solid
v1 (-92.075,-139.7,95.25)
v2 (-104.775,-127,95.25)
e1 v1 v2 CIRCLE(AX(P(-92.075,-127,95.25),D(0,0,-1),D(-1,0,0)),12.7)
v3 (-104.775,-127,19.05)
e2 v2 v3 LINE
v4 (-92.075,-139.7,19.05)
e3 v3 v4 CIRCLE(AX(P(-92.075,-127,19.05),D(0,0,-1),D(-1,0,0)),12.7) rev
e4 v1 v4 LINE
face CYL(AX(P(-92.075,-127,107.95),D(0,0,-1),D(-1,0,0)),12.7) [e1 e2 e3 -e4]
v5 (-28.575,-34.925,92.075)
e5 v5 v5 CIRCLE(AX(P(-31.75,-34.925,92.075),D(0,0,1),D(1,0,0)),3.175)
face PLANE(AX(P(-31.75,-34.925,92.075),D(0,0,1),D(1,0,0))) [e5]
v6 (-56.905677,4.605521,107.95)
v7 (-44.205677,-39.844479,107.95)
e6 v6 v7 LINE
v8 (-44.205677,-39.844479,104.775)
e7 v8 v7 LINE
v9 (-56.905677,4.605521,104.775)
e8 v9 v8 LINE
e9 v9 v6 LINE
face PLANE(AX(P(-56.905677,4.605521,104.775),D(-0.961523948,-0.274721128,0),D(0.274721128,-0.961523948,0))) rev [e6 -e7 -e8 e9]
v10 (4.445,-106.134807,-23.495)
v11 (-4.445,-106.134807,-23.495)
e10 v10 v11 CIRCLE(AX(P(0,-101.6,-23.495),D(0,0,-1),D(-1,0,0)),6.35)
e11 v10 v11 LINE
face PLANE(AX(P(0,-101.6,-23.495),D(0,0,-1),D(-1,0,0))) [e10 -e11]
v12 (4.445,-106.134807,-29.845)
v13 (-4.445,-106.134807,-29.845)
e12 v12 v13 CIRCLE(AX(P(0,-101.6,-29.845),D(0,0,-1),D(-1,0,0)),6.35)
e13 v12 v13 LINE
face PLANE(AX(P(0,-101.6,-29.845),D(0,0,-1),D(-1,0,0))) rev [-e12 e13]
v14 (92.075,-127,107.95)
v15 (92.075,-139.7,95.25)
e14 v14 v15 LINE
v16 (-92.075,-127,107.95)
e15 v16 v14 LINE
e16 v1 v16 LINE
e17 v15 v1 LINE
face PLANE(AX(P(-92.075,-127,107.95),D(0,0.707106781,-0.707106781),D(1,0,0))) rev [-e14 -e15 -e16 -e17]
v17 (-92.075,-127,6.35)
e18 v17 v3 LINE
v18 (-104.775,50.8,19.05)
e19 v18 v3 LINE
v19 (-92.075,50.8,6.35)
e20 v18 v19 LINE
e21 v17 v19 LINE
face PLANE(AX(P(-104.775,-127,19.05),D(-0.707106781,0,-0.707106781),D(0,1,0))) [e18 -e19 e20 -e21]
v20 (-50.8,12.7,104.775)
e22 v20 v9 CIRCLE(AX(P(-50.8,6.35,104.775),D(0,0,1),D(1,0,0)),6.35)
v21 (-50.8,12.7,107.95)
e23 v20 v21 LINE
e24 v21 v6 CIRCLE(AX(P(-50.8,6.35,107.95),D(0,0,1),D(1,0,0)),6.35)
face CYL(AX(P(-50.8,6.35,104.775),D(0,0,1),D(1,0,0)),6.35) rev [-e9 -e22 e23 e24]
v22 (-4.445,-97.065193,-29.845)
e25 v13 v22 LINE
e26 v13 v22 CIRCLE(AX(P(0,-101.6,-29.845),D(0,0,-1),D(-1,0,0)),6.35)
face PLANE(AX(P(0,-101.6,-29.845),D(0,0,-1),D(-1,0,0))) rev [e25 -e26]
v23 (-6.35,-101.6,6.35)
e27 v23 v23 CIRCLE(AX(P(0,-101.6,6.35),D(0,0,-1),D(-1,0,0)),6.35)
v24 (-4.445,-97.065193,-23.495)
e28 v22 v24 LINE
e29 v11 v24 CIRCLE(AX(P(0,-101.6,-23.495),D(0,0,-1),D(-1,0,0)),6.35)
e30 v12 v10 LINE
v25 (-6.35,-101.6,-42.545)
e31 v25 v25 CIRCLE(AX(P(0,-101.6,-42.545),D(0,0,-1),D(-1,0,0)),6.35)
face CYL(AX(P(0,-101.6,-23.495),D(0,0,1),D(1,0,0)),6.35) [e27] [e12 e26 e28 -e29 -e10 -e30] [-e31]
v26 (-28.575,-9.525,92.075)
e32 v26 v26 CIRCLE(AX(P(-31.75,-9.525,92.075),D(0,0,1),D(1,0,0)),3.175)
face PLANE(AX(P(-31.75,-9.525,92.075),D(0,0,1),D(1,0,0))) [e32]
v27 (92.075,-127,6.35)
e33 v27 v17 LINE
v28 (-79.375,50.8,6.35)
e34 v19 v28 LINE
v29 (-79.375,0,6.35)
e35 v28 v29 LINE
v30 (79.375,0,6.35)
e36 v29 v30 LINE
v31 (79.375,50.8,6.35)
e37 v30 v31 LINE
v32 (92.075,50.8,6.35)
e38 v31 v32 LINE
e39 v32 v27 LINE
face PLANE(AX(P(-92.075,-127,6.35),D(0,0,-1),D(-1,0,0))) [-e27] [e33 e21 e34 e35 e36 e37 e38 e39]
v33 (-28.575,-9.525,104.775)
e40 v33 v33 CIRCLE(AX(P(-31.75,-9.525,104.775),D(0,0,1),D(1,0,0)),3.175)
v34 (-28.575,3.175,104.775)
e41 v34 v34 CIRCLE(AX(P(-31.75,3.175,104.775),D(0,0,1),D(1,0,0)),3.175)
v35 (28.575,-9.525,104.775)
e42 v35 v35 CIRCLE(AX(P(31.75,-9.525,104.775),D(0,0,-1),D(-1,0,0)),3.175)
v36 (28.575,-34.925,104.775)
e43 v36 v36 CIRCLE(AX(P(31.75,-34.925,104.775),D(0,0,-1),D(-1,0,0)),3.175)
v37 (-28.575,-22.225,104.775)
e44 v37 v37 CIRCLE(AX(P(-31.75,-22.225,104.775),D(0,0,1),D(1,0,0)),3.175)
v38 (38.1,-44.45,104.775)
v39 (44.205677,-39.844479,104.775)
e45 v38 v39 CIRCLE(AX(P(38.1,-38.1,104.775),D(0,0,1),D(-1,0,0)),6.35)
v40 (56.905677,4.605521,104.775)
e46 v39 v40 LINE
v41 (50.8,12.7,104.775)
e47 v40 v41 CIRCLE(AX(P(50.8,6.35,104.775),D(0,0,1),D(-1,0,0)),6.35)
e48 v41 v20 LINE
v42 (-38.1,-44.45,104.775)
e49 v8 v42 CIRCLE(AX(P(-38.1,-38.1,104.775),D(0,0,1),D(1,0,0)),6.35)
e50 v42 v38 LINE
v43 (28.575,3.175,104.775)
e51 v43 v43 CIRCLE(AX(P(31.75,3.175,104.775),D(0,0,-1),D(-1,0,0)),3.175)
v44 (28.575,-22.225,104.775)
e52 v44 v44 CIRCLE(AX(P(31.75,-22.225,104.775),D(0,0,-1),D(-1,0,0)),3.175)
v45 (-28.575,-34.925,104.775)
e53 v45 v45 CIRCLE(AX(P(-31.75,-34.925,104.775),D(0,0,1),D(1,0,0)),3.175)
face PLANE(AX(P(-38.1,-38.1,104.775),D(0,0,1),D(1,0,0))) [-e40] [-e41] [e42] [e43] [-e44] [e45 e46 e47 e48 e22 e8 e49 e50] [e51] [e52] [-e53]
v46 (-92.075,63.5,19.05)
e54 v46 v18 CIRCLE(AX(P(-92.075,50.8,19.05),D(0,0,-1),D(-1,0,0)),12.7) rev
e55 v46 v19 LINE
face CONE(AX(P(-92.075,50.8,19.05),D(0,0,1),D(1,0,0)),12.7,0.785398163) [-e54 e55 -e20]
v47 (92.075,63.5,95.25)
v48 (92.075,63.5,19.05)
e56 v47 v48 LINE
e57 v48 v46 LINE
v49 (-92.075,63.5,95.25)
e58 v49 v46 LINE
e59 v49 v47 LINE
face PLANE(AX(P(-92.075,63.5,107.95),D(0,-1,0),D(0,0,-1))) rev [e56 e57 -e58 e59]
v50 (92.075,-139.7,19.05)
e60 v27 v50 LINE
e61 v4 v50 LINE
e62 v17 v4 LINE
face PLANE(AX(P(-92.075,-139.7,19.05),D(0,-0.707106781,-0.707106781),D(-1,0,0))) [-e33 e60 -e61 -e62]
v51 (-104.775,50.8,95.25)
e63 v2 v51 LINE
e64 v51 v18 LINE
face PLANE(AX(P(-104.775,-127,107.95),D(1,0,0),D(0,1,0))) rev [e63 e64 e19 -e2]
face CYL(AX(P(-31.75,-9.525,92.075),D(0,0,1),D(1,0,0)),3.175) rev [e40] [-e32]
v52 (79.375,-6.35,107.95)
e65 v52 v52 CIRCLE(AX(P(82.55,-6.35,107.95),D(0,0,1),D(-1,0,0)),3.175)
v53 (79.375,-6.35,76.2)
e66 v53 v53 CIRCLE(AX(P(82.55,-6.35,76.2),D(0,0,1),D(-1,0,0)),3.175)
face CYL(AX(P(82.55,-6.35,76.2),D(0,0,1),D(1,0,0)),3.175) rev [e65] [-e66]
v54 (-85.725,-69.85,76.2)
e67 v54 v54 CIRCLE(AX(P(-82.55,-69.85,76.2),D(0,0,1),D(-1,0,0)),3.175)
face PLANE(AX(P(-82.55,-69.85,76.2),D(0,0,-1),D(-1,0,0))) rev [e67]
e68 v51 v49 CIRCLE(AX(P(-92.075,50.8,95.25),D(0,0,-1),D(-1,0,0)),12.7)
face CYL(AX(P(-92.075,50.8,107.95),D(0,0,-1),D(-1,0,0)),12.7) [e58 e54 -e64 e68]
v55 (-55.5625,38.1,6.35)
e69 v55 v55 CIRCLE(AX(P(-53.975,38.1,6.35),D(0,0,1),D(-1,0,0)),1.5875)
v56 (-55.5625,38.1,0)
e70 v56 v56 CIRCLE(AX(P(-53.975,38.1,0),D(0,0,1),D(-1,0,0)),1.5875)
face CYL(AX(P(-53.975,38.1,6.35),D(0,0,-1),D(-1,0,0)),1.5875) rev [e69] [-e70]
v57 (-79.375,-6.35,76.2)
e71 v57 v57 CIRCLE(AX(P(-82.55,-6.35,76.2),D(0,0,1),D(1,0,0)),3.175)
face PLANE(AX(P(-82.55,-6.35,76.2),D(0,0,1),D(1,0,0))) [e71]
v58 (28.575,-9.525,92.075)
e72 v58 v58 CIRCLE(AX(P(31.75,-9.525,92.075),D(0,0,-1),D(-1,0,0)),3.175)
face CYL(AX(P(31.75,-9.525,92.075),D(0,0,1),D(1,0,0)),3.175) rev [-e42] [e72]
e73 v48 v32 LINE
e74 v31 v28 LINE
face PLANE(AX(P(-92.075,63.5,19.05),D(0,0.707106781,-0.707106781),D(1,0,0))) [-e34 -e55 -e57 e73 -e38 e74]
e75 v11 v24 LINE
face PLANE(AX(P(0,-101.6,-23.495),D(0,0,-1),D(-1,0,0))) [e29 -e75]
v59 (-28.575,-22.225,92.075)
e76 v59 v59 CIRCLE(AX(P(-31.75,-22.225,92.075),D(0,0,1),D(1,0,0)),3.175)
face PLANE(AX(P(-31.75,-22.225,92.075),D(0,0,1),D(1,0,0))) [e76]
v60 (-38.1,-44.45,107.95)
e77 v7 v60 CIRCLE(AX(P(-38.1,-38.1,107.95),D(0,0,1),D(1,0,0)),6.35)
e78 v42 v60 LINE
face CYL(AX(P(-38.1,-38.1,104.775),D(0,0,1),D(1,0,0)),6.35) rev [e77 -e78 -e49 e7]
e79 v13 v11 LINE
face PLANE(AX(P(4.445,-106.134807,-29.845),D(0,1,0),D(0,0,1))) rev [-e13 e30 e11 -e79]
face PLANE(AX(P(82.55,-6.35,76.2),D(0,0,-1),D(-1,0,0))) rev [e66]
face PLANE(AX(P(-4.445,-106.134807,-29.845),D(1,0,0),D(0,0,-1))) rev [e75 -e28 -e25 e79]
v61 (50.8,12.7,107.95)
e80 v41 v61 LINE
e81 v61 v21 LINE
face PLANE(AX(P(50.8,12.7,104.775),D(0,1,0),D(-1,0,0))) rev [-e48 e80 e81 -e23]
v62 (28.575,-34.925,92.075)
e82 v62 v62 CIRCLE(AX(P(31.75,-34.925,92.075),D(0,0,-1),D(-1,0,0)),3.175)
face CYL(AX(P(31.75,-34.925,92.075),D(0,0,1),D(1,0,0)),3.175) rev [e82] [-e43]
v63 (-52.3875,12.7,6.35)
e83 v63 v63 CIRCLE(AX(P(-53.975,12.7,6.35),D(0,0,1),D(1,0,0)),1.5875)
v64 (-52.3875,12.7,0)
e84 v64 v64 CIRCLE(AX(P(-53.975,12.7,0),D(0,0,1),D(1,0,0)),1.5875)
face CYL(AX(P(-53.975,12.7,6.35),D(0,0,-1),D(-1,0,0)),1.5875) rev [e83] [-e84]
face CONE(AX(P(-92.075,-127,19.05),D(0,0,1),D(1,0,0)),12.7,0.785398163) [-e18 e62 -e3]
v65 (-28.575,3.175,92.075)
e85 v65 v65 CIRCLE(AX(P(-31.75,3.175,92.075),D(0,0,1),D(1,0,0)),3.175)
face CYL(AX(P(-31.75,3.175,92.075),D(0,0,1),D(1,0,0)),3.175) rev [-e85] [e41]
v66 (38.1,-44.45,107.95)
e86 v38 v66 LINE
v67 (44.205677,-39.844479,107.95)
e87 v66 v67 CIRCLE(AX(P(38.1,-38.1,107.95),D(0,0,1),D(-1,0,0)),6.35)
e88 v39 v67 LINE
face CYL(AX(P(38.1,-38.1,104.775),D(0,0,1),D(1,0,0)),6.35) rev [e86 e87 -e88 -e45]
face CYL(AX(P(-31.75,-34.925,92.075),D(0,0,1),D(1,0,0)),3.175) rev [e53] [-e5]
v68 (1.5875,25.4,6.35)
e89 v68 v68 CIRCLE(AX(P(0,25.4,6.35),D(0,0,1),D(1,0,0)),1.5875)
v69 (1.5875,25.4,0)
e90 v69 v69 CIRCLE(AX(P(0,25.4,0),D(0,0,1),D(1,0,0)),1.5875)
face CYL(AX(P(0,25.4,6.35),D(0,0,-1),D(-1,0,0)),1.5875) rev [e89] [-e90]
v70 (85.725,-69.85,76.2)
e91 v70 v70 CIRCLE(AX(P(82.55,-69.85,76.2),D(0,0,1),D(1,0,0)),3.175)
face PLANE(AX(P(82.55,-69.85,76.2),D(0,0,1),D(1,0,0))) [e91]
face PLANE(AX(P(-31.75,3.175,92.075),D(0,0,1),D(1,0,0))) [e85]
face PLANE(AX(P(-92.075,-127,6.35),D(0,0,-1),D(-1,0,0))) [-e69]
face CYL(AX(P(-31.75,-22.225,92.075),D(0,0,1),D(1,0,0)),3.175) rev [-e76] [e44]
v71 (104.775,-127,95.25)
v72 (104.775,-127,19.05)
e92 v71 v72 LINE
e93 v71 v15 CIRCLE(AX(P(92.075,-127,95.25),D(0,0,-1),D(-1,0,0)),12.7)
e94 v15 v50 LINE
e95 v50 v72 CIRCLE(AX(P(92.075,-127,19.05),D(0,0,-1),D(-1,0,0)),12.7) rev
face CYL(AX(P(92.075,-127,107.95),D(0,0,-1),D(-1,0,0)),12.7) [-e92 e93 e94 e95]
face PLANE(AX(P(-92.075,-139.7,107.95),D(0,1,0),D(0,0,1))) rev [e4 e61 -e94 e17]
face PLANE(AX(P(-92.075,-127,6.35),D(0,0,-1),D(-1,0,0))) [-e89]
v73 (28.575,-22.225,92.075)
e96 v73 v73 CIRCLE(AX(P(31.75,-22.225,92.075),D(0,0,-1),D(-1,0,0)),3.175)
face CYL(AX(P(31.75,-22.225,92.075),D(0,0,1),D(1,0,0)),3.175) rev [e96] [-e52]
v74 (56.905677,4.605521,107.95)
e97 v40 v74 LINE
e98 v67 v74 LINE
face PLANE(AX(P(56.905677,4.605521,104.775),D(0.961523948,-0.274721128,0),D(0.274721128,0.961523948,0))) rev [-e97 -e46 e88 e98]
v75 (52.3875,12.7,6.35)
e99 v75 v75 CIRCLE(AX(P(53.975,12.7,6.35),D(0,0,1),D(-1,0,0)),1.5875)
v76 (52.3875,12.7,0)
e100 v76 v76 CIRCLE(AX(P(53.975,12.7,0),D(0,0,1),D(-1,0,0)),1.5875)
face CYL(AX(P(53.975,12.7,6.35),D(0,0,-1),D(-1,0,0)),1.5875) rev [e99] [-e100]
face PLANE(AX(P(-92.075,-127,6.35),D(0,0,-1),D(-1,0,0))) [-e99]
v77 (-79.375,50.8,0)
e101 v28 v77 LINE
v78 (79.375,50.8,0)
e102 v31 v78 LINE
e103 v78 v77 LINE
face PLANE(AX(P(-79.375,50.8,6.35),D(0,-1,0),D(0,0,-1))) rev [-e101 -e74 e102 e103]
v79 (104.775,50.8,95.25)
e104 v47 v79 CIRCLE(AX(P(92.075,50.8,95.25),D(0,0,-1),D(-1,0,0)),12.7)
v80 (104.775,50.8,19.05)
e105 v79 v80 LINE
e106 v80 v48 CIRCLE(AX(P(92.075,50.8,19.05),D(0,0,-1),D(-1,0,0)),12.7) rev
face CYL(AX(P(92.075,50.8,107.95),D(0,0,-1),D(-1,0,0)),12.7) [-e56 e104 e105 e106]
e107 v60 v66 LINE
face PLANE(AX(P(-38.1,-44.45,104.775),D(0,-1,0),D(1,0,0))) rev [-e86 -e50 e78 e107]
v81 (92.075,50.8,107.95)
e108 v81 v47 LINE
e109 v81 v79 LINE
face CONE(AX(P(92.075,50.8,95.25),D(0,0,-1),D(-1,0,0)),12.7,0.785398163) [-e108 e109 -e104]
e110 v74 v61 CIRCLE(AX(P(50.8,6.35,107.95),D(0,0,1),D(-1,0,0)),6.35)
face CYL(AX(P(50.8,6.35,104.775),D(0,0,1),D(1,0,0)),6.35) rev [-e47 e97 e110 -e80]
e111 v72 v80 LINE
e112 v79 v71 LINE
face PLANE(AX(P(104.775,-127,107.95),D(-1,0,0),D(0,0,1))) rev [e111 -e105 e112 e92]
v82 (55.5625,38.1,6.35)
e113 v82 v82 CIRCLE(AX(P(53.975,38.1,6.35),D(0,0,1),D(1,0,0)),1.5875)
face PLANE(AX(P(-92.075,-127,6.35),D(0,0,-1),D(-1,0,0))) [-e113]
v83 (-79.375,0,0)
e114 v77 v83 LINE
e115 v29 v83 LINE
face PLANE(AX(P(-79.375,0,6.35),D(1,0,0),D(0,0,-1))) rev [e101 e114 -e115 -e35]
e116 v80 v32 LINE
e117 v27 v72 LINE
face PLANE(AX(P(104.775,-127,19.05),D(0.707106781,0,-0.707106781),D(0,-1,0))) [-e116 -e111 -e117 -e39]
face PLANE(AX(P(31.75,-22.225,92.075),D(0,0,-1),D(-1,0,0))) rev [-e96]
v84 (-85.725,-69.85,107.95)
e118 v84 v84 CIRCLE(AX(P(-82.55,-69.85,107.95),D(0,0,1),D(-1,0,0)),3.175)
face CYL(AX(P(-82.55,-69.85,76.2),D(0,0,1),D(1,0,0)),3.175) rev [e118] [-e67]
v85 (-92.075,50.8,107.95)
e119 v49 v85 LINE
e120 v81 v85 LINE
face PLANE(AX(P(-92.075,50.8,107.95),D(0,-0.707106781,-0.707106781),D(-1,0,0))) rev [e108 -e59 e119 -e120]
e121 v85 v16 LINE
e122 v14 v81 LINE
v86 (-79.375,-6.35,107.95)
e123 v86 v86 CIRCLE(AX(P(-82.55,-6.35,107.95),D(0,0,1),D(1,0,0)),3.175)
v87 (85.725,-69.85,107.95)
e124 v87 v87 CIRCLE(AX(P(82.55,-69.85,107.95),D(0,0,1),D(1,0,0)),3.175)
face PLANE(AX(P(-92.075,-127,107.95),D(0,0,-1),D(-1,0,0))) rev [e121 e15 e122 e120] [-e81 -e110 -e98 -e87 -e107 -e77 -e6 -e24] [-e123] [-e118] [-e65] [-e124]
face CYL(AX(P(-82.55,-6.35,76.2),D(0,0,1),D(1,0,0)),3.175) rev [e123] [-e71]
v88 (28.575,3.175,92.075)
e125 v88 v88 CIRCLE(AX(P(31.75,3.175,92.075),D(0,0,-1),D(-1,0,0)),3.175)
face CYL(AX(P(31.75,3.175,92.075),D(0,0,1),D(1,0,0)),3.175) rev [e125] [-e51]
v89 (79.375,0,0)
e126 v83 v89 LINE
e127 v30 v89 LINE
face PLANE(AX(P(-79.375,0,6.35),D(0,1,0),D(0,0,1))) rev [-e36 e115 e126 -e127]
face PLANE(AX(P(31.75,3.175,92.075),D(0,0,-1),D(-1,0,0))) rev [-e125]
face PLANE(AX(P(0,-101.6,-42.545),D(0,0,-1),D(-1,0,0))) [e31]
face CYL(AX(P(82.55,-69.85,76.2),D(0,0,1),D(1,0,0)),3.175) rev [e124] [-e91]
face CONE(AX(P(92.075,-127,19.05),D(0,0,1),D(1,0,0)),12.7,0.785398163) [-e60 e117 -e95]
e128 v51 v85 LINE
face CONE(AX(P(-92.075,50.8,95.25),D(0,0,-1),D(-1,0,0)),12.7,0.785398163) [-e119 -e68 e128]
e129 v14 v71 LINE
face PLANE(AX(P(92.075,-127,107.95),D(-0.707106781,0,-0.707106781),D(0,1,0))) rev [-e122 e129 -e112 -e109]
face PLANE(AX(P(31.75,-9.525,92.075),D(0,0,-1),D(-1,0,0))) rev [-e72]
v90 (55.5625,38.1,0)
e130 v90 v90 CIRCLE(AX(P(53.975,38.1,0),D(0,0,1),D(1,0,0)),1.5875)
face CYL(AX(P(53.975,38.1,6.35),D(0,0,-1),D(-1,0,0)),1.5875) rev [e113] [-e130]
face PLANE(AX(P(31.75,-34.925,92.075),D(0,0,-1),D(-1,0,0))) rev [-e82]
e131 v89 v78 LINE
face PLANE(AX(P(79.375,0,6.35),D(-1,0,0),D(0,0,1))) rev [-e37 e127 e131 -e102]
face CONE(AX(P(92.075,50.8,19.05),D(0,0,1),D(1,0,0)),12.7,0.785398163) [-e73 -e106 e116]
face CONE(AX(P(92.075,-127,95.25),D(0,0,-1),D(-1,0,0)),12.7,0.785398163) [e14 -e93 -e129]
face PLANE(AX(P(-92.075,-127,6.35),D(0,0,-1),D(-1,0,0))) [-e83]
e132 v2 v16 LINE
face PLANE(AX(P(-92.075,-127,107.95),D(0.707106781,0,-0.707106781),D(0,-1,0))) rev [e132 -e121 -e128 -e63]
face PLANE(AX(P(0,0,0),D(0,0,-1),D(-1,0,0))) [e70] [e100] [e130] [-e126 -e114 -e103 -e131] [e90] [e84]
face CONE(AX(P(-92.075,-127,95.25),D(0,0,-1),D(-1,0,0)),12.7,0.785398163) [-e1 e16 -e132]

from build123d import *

# Parameters (mm, degrees)
SKETCH1_W           = 158.75
SKETCH1_H           = 50.8
SKETCH1_R           = 1.5875
BOSS_EXTRUDE1_DEPTH = 6.35
BOSS_EXTRUDE2_DEPTH = 101.6
CHAMFER1_SIZE       = 12.7
SKETCH3_R           = 3.175
CUT_EXTRUDE3_DEPTH  = 31.75
CUT_EXTRUDE4_DEPTH  = 3.175
SKETCH5_R           = 3.175
CUT_EXTRUDE5_DEPTH  = 12.7
SKETCH6_R           = 6.35
BOSS_EXTRUDE3_DEPTH = 29.845
BOSS_EXTRUDE4_DEPTH = 6.35
SKETCH8_R           = 6.35
BOSS_EXTRUDE5_DEPTH = 12.7


with BuildPart() as part:
    # Sketch1 → Boss-Extrude1 (new body)
    with BuildSketch(Plane.XY):
        with Locations((0, 25.4)):
            Rectangle(SKETCH1_W, SKETCH1_H)
        with Locations((53.975, 38.1)):
            Circle(SKETCH1_R, mode=Mode.SUBTRACT)
        with Locations(Location((53.975, 12.7, 0), (0, 0, 180))):
            Circle(SKETCH1_R, mode=Mode.SUBTRACT)
        with Locations((-53.975, 12.7)):
            Circle(SKETCH1_R, mode=Mode.SUBTRACT)
        with Locations(Location((-53.975, 38.1, 0), (0, 0, 180))):
            Circle(SKETCH1_R, mode=Mode.SUBTRACT)
        with Locations((0, 25.4)):
            Circle(SKETCH1_R, mode=Mode.SUBTRACT)
    extrude(amount=BOSS_EXTRUDE1_DEPTH)

    # Sketch2 → Boss-Extrude2 (add)
    with BuildSketch(Plane.XY.offset(6.35)):
        with BuildLine():
            Line((-92.075, -139.7), (92.075, -139.7))
            ThreePointArc((92.075, -139.7), (101.055256121, -135.980256121), (104.775, -127))
            Line((104.775, -127), (104.775, 50.8))
            ThreePointArc((104.775, 50.8), (101.055256121, 59.780256121), (92.075, 63.5))
            Line((92.075, 63.5), (-92.075, 63.5))
            ThreePointArc((-92.075, 63.5), (-101.055256121, 59.780256121), (-104.775, 50.8))
            Line((-104.775, 50.8), (-104.775, -127))
            ThreePointArc((-104.775, -127), (-101.055256121, -135.980256121), (-92.075, -139.7))
        make_face()
    extrude(amount=BOSS_EXTRUDE2_DEPTH)

    # Chamfer1
    chamfer1_edges = [part.edges().sort_by_distance(p)[0] for p in [
        (-101.055256121, -135.980256121, 6.35),
        (0, -139.7, 6.35),
        (101.055256121, -135.980256121, 6.35),
        (104.775, -38.1, 6.35),
        (101.055256121, 59.780256121, 6.35),
        (0, 63.5, 6.35),
        (-101.055256121, 59.780256121, 6.35),
        (-104.775, -38.1, 6.35),
        (-101.055256121, -135.980256121, 107.95),
        (0, -139.7, 107.95),
        (101.055256121, -135.980256121, 107.95),
        (104.775, -38.1, 107.95),
        (101.055256121, 59.780256121, 107.95),
        (0, 63.5, 107.95),
        (-101.055256121, 59.780256121, 107.95),
        (-104.775, -38.1, 107.95),
    ]]
    chamfer(chamfer1_edges, length=CHAMFER1_SIZE - 0.0001)  # a hair under: the kernel refuses the full size

    # Sketch3 → Cut-Extrude3 (cut)
    with BuildSketch(Plane.XY.offset(107.95)):
        with Locations((-82.55, -6.35)):
            Circle(SKETCH3_R)
        with Locations(Location((-82.55, -69.85, 0), (0, 0, 180))):
            Circle(SKETCH3_R)
        with Locations((82.55, -69.85)):
            Circle(SKETCH3_R)
        with Locations(Location((82.55, -6.35, 0), (0, 0, 180))):
            Circle(SKETCH3_R)
    extrude(amount=-CUT_EXTRUDE3_DEPTH, mode=Mode.SUBTRACT)

    # Sketch4 → Cut-Extrude4 (cut)
    with BuildSketch(Plane.XY.offset(107.95)):
        with BuildLine():
            Line((50.8, 12.7), (-50.8, 12.7))
            ThreePointArc((-50.8, 12.7), (-55.869513916, 10.173941508), (-56.905677068, 4.605520838))
            Line((-56.905677068, 4.605520838), (-44.205677068, -39.844479162))
            ThreePointArc((-44.205677068, -39.844479162), (-41.923941508, -43.169513916), (-38.1, -44.45))
            Line((-38.1, -44.45), (38.1, -44.45))
            ThreePointArc((38.1, -44.45), (41.923941508, -43.169513916), (44.205677068, -39.844479162))
            Line((44.205677068, -39.844479162), (56.905677068, 4.605520838))
            ThreePointArc((56.905677068, 4.605520838), (55.869513916, 10.173941508), (50.8, 12.7))
        make_face()
    extrude(amount=-CUT_EXTRUDE4_DEPTH, mode=Mode.SUBTRACT)

    # Sketch5 → Cut-Extrude5 (cut)
    with BuildSketch(Plane.XY.offset(104.775)):
        with Locations((-31.75, 3.175)):
            Circle(SKETCH5_R)
        with Locations((-31.75, -9.525)):
            Circle(SKETCH5_R)
        with Locations((-31.75, -22.225)):
            Circle(SKETCH5_R)
        with Locations((-31.75, -34.925)):
            Circle(SKETCH5_R)
        with Locations(Location((31.75, -34.925, 0), (0, 0, 180))):
            Circle(SKETCH5_R)
        with Locations(Location((31.75, -22.225, 0), (0, 0, 180))):
            Circle(SKETCH5_R)
        with Locations(Location((31.75, -9.525, 0), (0, 0, 180))):
            Circle(SKETCH5_R)
        with Locations(Location((31.75, 3.175, 0), (0, 0, 180))):
            Circle(SKETCH5_R)
    extrude(amount=-CUT_EXTRUDE5_DEPTH, mode=Mode.SUBTRACT)

    # Sketch6 → Boss-Extrude3 (add)
    with BuildSketch(Plane(origin=(0, 0, 6.35), x_dir=(-1, 0, 0), z_dir=(0, 0, -1))):
        with Locations(Location((0, -101.6, 0), (0, 0, 180))):
            Circle(SKETCH6_R)
    extrude(amount=BOSS_EXTRUDE3_DEPTH)

    # Sketch7 → Boss-Extrude4 (add)
    with BuildSketch(Plane(origin=(0, 0, -23.495), x_dir=(-1, 0, 0), z_dir=(0, 0, -1))):
        with BuildLine():
            Line((-4.445, -106.134807052), (4.445, -106.134807052))
            Line((4.445, -106.134807052), (4.445, -97.065192948))
            ThreePointArc((4.445, -97.065192948), (-4.534807052, -97.155), (-4.445, -106.134807052))
        make_face()
    extrude(amount=BOSS_EXTRUDE4_DEPTH)

    # Sketch8 → Boss-Extrude5 (add)
    with BuildSketch(Plane(origin=(0, 0, -29.845), x_dir=(-1, 0, 0), z_dir=(0, 0, -1))):
        with Locations((0, -101.6)):
            Circle(SKETCH8_R)
    extrude(amount=BOSS_EXTRUDE5_DEPTH)


solid = part.part
